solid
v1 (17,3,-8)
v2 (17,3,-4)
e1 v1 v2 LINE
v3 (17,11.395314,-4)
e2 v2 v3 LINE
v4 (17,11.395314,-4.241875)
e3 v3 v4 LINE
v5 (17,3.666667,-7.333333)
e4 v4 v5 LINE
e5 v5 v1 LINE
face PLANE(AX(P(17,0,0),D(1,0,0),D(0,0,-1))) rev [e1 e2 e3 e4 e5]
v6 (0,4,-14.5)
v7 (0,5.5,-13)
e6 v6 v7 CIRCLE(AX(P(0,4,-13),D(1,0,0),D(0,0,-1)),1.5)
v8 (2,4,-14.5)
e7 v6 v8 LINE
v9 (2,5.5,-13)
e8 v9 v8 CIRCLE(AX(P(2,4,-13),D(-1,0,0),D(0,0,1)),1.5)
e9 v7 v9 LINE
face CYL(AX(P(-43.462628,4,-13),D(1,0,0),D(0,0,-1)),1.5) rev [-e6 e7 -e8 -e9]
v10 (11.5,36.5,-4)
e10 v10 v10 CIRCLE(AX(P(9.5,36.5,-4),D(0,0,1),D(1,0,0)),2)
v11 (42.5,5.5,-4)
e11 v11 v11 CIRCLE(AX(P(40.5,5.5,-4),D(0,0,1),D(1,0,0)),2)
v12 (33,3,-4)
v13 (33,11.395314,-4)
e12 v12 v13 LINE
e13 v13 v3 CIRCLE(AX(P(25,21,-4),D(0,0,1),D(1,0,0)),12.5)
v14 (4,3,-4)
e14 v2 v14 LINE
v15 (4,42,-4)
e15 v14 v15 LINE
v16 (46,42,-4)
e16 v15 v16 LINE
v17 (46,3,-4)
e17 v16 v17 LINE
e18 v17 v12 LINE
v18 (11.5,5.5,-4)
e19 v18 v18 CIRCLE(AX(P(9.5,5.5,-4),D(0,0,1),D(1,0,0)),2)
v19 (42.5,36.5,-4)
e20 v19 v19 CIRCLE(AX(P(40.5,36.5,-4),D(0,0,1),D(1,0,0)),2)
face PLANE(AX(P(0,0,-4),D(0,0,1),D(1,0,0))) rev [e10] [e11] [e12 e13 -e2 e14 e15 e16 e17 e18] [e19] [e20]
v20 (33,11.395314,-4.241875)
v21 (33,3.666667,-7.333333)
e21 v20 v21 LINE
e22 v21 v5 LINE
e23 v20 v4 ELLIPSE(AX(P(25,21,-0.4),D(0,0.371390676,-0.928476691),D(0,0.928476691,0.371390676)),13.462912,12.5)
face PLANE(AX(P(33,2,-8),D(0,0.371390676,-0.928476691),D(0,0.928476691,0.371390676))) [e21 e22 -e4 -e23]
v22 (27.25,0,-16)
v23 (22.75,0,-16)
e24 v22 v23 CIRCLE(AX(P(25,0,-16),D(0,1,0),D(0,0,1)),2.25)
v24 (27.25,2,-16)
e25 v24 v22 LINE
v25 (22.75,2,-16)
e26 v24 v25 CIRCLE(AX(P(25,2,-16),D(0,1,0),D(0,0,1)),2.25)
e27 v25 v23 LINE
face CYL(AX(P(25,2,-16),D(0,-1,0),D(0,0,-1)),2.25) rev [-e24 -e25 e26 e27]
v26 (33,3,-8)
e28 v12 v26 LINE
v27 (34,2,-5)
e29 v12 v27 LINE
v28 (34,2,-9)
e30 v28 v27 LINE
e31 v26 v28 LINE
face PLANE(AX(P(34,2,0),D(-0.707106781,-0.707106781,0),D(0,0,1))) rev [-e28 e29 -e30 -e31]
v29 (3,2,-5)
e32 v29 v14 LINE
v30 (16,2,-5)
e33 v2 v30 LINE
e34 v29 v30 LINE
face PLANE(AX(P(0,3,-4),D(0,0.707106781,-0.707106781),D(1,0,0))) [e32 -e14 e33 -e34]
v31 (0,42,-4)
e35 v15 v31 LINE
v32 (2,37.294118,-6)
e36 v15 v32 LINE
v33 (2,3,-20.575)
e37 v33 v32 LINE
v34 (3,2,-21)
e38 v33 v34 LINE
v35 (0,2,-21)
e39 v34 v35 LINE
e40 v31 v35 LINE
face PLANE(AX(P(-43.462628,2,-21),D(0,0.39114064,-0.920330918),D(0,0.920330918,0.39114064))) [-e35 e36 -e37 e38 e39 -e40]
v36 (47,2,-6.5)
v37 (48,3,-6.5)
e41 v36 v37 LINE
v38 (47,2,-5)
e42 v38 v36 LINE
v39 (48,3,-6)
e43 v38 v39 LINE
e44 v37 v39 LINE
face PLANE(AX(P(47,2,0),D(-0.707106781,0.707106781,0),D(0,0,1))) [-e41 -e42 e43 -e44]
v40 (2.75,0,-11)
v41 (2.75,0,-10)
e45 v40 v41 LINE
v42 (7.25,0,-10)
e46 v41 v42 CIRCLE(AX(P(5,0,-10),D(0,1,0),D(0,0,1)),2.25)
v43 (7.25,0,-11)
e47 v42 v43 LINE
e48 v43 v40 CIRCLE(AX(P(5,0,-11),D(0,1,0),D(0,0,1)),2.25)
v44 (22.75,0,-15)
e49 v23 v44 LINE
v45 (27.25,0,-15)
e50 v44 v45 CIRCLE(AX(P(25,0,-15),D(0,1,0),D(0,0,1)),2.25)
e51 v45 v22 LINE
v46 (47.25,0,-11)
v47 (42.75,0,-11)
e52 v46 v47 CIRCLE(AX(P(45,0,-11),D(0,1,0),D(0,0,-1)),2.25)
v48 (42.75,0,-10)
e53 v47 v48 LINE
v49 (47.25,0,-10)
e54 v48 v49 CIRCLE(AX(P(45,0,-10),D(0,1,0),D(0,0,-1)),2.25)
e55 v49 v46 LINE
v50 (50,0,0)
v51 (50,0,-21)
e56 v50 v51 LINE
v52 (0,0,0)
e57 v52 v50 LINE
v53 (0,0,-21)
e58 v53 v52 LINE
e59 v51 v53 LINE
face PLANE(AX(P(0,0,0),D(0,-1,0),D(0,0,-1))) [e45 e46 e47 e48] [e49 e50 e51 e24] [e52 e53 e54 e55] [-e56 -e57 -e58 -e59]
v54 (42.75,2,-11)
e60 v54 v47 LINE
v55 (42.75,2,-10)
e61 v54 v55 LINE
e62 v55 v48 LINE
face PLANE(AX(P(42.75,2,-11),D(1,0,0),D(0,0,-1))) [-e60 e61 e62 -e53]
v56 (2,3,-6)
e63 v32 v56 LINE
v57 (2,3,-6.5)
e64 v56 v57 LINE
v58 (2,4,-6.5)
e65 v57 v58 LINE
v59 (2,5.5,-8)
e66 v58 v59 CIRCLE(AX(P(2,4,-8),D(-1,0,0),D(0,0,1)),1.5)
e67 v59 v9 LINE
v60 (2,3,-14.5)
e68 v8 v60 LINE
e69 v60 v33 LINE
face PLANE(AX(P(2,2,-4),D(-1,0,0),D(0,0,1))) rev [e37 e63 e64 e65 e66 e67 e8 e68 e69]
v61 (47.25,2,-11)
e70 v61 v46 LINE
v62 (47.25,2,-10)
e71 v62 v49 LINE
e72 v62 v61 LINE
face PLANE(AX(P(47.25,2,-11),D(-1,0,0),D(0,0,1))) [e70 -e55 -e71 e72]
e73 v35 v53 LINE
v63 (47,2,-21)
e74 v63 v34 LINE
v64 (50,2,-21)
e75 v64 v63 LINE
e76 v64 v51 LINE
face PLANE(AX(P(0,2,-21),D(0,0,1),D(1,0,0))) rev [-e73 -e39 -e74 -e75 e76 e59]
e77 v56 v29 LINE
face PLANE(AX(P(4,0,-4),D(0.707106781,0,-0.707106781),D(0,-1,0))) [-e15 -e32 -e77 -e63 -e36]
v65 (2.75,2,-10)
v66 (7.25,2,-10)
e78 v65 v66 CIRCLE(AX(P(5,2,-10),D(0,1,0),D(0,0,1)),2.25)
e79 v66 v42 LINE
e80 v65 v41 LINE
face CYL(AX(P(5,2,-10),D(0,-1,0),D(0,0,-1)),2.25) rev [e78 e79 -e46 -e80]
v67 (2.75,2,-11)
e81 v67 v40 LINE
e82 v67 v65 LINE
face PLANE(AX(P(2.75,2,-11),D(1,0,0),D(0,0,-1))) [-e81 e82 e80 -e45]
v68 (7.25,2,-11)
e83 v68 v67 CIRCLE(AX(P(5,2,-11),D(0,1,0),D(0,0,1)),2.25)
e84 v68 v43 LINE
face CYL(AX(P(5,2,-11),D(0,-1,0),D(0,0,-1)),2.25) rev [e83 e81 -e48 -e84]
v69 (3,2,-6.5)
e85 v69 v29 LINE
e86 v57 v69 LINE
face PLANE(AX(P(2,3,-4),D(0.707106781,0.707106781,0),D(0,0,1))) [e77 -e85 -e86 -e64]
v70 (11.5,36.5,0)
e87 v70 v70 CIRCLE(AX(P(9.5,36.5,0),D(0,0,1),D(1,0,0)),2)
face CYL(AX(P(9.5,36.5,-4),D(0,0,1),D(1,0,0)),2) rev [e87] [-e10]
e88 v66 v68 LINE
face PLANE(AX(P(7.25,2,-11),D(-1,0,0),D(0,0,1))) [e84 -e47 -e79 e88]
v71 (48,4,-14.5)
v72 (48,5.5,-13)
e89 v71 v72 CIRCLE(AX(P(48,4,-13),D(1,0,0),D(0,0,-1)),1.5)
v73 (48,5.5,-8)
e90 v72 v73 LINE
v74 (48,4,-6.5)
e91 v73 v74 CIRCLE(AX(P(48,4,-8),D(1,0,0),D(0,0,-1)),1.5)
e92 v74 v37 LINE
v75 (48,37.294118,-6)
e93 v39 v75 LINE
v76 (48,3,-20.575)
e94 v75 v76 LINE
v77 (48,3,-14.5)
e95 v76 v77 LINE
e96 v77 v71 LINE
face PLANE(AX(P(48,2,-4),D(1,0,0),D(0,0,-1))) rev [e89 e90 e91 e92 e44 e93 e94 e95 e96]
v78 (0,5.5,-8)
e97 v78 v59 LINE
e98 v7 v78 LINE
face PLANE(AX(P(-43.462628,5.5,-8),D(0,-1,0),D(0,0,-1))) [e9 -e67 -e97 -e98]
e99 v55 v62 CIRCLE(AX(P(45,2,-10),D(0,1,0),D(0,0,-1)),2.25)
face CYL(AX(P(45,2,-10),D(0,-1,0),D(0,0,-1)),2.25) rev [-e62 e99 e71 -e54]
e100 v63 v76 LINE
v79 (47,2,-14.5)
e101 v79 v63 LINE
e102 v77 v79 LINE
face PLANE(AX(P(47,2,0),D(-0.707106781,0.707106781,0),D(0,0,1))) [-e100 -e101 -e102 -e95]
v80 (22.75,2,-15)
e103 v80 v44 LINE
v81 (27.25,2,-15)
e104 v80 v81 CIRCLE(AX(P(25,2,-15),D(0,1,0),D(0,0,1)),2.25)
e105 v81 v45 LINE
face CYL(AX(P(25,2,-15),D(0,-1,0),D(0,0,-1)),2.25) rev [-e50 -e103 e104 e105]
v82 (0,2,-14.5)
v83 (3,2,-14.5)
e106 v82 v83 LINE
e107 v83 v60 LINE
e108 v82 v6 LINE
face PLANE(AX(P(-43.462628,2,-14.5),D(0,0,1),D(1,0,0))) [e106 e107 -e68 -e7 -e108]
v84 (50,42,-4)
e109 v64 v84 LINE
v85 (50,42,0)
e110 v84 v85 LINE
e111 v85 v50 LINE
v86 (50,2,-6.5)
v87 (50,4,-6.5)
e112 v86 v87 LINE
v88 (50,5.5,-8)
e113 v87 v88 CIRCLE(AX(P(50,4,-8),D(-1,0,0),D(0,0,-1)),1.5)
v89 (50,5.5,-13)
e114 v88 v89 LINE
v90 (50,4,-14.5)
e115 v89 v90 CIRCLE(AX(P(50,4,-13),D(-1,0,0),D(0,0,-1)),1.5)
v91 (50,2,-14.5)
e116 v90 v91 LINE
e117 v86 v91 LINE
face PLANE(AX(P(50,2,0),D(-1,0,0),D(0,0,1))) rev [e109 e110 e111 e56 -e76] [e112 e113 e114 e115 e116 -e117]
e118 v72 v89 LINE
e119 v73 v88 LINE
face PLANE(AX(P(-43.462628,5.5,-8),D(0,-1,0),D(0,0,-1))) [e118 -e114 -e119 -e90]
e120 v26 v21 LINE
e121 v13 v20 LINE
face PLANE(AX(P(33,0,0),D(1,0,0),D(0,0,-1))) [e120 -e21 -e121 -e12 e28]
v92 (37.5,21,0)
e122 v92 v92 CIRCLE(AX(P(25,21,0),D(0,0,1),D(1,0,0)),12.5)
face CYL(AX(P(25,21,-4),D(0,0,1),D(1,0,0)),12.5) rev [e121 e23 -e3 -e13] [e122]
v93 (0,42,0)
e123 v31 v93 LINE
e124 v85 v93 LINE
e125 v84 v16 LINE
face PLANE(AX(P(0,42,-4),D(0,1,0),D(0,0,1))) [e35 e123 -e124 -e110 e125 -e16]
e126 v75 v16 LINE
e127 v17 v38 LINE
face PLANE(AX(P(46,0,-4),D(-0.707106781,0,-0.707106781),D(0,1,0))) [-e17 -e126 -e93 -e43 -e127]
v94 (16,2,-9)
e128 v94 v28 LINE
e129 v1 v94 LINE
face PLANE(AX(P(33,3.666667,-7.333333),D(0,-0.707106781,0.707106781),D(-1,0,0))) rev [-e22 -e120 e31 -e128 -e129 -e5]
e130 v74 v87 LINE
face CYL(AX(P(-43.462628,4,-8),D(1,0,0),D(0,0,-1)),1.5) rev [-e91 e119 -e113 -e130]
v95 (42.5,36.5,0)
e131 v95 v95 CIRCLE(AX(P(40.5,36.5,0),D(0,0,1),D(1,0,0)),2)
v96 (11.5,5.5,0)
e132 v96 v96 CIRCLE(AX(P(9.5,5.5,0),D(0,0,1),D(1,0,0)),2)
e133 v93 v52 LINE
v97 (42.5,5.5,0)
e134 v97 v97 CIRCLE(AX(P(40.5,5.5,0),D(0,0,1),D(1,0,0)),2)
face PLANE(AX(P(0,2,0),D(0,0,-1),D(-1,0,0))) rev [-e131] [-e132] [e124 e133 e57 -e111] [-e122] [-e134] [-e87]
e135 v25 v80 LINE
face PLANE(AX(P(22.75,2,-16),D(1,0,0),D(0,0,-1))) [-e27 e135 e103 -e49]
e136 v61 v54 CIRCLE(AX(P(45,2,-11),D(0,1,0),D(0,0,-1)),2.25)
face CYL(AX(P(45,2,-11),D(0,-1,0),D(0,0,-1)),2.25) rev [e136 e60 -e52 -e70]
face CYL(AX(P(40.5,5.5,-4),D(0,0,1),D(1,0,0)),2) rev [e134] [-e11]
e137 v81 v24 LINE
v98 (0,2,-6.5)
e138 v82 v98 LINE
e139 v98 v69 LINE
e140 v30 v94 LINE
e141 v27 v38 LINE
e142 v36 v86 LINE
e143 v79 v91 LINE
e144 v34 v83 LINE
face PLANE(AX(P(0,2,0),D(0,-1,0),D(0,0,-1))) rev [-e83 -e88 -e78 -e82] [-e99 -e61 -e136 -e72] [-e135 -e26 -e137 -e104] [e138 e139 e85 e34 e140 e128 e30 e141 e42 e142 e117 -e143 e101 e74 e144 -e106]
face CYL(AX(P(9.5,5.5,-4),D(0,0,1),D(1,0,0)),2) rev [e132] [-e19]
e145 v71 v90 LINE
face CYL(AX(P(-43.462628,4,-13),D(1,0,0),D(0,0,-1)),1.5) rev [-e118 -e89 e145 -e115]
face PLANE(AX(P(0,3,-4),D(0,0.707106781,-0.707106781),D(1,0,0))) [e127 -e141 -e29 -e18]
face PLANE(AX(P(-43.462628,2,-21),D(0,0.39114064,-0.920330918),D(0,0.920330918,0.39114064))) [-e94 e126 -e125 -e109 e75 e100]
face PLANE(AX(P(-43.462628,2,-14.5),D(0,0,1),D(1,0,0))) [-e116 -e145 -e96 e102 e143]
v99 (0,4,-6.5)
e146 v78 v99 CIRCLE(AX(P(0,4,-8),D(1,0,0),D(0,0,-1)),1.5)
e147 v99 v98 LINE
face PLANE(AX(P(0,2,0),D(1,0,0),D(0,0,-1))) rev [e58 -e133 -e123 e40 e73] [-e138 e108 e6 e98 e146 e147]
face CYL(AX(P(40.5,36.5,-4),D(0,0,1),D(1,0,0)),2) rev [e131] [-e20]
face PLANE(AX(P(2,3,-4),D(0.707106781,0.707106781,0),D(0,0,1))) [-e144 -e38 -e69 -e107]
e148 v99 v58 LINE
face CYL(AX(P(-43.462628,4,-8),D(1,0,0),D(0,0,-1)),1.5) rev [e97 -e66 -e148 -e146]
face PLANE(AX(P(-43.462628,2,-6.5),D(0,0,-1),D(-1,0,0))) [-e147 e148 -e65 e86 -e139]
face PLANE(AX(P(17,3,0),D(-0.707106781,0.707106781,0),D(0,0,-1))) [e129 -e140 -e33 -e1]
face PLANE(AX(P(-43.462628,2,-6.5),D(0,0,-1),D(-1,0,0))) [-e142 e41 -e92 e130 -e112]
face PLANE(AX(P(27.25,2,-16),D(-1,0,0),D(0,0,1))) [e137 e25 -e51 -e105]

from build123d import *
from OCP.BRepFilletAPI import BRepFilletAPI_MakeChamfer

# Parameters (mm, degrees)
SKETCH1_W                = 50
SKETCH1_H                = 21
BOSS_EXTRUDE1_DEPTH      = 2
SKETCH2_W                = 50
SKETCH2_H                = 42
SKETCH2_R                = 2
SKETCH2_R_2              = 12.5
BOSS_EXTRUDE2_DEPTH      = 4
BOSS_EXTRUDE3_START      = -50
BOSS_EXTRUDE3_DEPTH      = 50
CUT_EXTRUDE1_START       = -17
SKETCH4_W                = 46
SKETCH4_H                = 40
CUT_EXTRUDE1_DEPTH       = 17
BOSS_EXTRUDE4_DEPTH      = 8
BOSS_EXTRUDE4_DEPTH_BACK = 8
SKETCH6_R                = 12.5
CUT_EXTRUDE2_DEPTH       = 68.475921631
CHAMFER1_SIZE            = 1
CHAMFER1_SIZE2           = 1.795054936
CHAMFER2_SIZE            = 2


with BuildPart() as part:
    # Sketch1 → Boss-Extrude1 (new body)
    with BuildSketch(Plane(origin=(0, 0, 0), x_dir=(1, 0, 0), z_dir=(0, 1, 0))):
        with Locations((25, 10.5)):
            Rectangle(SKETCH1_W, SKETCH1_H)
        with BuildLine():
            Line((7.25, 11), (7.25, 10))
            ThreePointArc((7.25, 10), (5, 7.75), (2.75, 10))
            Line((2.75, 10), (2.75, 11))
            ThreePointArc((2.75, 11), (5, 13.25), (7.25, 11))
        make_face(mode=Mode.SUBTRACT)
        with BuildLine():
            Line((42.75, 11), (42.75, 10))
            ThreePointArc((42.75, 10), (45, 7.75), (47.25, 10))
            Line((47.25, 10), (47.25, 11))
            ThreePointArc((47.25, 11), (45, 13.25), (42.75, 11))
        make_face(mode=Mode.SUBTRACT)
        with BuildLine():
            Line((27.25, 16), (27.25, 15))
            ThreePointArc((27.25, 15), (25, 12.75), (22.75, 15))
            Line((22.75, 15), (22.75, 16))
            ThreePointArc((22.75, 16), (25, 18.25), (27.25, 16))
        make_face(mode=Mode.SUBTRACT)
    extrude(amount=BOSS_EXTRUDE1_DEPTH)

    # Sketch2 → Boss-Extrude2 (add)
    with BuildSketch(Plane.XY):
        with Locations((25, 21)):
            Rectangle(SKETCH2_W, SKETCH2_H)
        with Locations((9.5, 36.5)):
            Circle(SKETCH2_R, mode=Mode.SUBTRACT)
        with Locations((9.5, 5.5)):
            Circle(SKETCH2_R, mode=Mode.SUBTRACT)
        with Locations((40.5, 5.5)):
            Circle(SKETCH2_R, mode=Mode.SUBTRACT)
        with Locations((40.5, 36.5)):
            Circle(SKETCH2_R, mode=Mode.SUBTRACT)
        with Locations((25, 21)):
            Circle(SKETCH2_R_2, mode=Mode.SUBTRACT)
    extrude(amount=-BOSS_EXTRUDE2_DEPTH)

    # Sketch3 → Boss-Extrude3 (add)
    with BuildSketch(Plane(origin=(50, 0, 0), x_dir=(0, 0, -1), z_dir=(1, 0, 0)).offset(BOSS_EXTRUDE3_START)):
        with BuildLine():
            Line((21, 2), (4, 42))
            Line((4, 42), (4, 2))
            Line((4, 2), (6.5, 2))
            Line((6.5, 2), (6.5, 4))
            ThreePointArc((6.5, 4), (6.939339828, 5.060660172), (8, 5.5))
            Line((8, 5.5), (13, 5.5))
            ThreePointArc((13, 5.5), (14.060660172, 5.060660172), (14.5, 4))
            Line((14.5, 4), (14.5, 2))
            Line((14.5, 2), (21, 2))
        make_face()
    extrude(amount=BOSS_EXTRUDE3_DEPTH)

    # Sketch4 → Cut-Extrude1 (cut)
    with BuildSketch(Plane(origin=(0, 0, -21), x_dir=(-1, 0, 0), z_dir=(0, 0, -1)).offset(CUT_EXTRUDE1_START)):
        with Locations((-25, 22)):
            Rectangle(SKETCH4_W, SKETCH4_H)
    extrude(amount=CUT_EXTRUDE1_DEPTH, mode=Mode.SUBTRACT)

    # Sketch5 → Boss-Extrude4 (add, two sides: drawn at the far end of the back side and taken through both)
    with BuildSketch(Plane.ZY.offset(-25).offset(-BOSS_EXTRUDE4_DEPTH_BACK)):
        Polygon((-4, 2), (-8, 2), (-4, 12), align=None)
    extrude(amount=BOSS_EXTRUDE4_DEPTH + BOSS_EXTRUDE4_DEPTH_BACK)

    # Sketch6 → Cut-Extrude2 (cut, through all)
    with BuildSketch(Plane.XY.offset(-4)):
        with Locations((25, 21)):
            Circle(SKETCH6_R)
    extrude(amount=-CUT_EXTRUDE2_DEPTH, mode=Mode.SUBTRACT)

    # Chamfer1: one chamfer whose edges measure the first distance from different faces: ONE call of the kernel's chamfer builder (chamfer() names one face for all edges)
    chamfer1_edges_1 = [part.edges().sort_by_distance(p)[0] for p in [
        (2, 2, -17.75),
        (48, 2, -17.75),
        (48, 2, -5.25),
        (40.5, 2, -4),
        (2, 2, -5.25),
        (9.5, 2, -4),
        (33, 2, -6),
        (17, 2, -6),
    ]]
    chamfer1_edges_2 = [part.edges().sort_by_distance(p)[0] for p in [
        (25, 2, -8),
    ]]
    chamfer1_side_2 = [part.faces().sort_by_distance(p)[0] for p in [
        (1, 2, -13.971890163),
    ]]
    chamfer1 = BRepFilletAPI_MakeChamfer(part.part.solid().wrapped)
    for e in chamfer1_edges_1:
        chamfer1.Add(CHAMFER1_SIZE, e.wrapped)
    for e in chamfer1_edges_2:
        chamfer1.Add(CHAMFER1_SIZE, CHAMFER1_SIZE2, e.wrapped, chamfer1_side_2[0].wrapped)  # the first distance lies on this face
    add(Compound.cast(chamfer1.Shape()), mode=Mode.REPLACE)

    # Chamfer2
    chamfer2_edges = [part.edges().sort_by_distance(p)[0] for p in [
        (48, 22.5, -4),
        (2, 22.5, -4),
    ]]
    chamfer(chamfer2_edges, length=CHAMFER2_SIZE - 0.0001)  # a hair under: the kernel refuses the full size


solid = part.part
